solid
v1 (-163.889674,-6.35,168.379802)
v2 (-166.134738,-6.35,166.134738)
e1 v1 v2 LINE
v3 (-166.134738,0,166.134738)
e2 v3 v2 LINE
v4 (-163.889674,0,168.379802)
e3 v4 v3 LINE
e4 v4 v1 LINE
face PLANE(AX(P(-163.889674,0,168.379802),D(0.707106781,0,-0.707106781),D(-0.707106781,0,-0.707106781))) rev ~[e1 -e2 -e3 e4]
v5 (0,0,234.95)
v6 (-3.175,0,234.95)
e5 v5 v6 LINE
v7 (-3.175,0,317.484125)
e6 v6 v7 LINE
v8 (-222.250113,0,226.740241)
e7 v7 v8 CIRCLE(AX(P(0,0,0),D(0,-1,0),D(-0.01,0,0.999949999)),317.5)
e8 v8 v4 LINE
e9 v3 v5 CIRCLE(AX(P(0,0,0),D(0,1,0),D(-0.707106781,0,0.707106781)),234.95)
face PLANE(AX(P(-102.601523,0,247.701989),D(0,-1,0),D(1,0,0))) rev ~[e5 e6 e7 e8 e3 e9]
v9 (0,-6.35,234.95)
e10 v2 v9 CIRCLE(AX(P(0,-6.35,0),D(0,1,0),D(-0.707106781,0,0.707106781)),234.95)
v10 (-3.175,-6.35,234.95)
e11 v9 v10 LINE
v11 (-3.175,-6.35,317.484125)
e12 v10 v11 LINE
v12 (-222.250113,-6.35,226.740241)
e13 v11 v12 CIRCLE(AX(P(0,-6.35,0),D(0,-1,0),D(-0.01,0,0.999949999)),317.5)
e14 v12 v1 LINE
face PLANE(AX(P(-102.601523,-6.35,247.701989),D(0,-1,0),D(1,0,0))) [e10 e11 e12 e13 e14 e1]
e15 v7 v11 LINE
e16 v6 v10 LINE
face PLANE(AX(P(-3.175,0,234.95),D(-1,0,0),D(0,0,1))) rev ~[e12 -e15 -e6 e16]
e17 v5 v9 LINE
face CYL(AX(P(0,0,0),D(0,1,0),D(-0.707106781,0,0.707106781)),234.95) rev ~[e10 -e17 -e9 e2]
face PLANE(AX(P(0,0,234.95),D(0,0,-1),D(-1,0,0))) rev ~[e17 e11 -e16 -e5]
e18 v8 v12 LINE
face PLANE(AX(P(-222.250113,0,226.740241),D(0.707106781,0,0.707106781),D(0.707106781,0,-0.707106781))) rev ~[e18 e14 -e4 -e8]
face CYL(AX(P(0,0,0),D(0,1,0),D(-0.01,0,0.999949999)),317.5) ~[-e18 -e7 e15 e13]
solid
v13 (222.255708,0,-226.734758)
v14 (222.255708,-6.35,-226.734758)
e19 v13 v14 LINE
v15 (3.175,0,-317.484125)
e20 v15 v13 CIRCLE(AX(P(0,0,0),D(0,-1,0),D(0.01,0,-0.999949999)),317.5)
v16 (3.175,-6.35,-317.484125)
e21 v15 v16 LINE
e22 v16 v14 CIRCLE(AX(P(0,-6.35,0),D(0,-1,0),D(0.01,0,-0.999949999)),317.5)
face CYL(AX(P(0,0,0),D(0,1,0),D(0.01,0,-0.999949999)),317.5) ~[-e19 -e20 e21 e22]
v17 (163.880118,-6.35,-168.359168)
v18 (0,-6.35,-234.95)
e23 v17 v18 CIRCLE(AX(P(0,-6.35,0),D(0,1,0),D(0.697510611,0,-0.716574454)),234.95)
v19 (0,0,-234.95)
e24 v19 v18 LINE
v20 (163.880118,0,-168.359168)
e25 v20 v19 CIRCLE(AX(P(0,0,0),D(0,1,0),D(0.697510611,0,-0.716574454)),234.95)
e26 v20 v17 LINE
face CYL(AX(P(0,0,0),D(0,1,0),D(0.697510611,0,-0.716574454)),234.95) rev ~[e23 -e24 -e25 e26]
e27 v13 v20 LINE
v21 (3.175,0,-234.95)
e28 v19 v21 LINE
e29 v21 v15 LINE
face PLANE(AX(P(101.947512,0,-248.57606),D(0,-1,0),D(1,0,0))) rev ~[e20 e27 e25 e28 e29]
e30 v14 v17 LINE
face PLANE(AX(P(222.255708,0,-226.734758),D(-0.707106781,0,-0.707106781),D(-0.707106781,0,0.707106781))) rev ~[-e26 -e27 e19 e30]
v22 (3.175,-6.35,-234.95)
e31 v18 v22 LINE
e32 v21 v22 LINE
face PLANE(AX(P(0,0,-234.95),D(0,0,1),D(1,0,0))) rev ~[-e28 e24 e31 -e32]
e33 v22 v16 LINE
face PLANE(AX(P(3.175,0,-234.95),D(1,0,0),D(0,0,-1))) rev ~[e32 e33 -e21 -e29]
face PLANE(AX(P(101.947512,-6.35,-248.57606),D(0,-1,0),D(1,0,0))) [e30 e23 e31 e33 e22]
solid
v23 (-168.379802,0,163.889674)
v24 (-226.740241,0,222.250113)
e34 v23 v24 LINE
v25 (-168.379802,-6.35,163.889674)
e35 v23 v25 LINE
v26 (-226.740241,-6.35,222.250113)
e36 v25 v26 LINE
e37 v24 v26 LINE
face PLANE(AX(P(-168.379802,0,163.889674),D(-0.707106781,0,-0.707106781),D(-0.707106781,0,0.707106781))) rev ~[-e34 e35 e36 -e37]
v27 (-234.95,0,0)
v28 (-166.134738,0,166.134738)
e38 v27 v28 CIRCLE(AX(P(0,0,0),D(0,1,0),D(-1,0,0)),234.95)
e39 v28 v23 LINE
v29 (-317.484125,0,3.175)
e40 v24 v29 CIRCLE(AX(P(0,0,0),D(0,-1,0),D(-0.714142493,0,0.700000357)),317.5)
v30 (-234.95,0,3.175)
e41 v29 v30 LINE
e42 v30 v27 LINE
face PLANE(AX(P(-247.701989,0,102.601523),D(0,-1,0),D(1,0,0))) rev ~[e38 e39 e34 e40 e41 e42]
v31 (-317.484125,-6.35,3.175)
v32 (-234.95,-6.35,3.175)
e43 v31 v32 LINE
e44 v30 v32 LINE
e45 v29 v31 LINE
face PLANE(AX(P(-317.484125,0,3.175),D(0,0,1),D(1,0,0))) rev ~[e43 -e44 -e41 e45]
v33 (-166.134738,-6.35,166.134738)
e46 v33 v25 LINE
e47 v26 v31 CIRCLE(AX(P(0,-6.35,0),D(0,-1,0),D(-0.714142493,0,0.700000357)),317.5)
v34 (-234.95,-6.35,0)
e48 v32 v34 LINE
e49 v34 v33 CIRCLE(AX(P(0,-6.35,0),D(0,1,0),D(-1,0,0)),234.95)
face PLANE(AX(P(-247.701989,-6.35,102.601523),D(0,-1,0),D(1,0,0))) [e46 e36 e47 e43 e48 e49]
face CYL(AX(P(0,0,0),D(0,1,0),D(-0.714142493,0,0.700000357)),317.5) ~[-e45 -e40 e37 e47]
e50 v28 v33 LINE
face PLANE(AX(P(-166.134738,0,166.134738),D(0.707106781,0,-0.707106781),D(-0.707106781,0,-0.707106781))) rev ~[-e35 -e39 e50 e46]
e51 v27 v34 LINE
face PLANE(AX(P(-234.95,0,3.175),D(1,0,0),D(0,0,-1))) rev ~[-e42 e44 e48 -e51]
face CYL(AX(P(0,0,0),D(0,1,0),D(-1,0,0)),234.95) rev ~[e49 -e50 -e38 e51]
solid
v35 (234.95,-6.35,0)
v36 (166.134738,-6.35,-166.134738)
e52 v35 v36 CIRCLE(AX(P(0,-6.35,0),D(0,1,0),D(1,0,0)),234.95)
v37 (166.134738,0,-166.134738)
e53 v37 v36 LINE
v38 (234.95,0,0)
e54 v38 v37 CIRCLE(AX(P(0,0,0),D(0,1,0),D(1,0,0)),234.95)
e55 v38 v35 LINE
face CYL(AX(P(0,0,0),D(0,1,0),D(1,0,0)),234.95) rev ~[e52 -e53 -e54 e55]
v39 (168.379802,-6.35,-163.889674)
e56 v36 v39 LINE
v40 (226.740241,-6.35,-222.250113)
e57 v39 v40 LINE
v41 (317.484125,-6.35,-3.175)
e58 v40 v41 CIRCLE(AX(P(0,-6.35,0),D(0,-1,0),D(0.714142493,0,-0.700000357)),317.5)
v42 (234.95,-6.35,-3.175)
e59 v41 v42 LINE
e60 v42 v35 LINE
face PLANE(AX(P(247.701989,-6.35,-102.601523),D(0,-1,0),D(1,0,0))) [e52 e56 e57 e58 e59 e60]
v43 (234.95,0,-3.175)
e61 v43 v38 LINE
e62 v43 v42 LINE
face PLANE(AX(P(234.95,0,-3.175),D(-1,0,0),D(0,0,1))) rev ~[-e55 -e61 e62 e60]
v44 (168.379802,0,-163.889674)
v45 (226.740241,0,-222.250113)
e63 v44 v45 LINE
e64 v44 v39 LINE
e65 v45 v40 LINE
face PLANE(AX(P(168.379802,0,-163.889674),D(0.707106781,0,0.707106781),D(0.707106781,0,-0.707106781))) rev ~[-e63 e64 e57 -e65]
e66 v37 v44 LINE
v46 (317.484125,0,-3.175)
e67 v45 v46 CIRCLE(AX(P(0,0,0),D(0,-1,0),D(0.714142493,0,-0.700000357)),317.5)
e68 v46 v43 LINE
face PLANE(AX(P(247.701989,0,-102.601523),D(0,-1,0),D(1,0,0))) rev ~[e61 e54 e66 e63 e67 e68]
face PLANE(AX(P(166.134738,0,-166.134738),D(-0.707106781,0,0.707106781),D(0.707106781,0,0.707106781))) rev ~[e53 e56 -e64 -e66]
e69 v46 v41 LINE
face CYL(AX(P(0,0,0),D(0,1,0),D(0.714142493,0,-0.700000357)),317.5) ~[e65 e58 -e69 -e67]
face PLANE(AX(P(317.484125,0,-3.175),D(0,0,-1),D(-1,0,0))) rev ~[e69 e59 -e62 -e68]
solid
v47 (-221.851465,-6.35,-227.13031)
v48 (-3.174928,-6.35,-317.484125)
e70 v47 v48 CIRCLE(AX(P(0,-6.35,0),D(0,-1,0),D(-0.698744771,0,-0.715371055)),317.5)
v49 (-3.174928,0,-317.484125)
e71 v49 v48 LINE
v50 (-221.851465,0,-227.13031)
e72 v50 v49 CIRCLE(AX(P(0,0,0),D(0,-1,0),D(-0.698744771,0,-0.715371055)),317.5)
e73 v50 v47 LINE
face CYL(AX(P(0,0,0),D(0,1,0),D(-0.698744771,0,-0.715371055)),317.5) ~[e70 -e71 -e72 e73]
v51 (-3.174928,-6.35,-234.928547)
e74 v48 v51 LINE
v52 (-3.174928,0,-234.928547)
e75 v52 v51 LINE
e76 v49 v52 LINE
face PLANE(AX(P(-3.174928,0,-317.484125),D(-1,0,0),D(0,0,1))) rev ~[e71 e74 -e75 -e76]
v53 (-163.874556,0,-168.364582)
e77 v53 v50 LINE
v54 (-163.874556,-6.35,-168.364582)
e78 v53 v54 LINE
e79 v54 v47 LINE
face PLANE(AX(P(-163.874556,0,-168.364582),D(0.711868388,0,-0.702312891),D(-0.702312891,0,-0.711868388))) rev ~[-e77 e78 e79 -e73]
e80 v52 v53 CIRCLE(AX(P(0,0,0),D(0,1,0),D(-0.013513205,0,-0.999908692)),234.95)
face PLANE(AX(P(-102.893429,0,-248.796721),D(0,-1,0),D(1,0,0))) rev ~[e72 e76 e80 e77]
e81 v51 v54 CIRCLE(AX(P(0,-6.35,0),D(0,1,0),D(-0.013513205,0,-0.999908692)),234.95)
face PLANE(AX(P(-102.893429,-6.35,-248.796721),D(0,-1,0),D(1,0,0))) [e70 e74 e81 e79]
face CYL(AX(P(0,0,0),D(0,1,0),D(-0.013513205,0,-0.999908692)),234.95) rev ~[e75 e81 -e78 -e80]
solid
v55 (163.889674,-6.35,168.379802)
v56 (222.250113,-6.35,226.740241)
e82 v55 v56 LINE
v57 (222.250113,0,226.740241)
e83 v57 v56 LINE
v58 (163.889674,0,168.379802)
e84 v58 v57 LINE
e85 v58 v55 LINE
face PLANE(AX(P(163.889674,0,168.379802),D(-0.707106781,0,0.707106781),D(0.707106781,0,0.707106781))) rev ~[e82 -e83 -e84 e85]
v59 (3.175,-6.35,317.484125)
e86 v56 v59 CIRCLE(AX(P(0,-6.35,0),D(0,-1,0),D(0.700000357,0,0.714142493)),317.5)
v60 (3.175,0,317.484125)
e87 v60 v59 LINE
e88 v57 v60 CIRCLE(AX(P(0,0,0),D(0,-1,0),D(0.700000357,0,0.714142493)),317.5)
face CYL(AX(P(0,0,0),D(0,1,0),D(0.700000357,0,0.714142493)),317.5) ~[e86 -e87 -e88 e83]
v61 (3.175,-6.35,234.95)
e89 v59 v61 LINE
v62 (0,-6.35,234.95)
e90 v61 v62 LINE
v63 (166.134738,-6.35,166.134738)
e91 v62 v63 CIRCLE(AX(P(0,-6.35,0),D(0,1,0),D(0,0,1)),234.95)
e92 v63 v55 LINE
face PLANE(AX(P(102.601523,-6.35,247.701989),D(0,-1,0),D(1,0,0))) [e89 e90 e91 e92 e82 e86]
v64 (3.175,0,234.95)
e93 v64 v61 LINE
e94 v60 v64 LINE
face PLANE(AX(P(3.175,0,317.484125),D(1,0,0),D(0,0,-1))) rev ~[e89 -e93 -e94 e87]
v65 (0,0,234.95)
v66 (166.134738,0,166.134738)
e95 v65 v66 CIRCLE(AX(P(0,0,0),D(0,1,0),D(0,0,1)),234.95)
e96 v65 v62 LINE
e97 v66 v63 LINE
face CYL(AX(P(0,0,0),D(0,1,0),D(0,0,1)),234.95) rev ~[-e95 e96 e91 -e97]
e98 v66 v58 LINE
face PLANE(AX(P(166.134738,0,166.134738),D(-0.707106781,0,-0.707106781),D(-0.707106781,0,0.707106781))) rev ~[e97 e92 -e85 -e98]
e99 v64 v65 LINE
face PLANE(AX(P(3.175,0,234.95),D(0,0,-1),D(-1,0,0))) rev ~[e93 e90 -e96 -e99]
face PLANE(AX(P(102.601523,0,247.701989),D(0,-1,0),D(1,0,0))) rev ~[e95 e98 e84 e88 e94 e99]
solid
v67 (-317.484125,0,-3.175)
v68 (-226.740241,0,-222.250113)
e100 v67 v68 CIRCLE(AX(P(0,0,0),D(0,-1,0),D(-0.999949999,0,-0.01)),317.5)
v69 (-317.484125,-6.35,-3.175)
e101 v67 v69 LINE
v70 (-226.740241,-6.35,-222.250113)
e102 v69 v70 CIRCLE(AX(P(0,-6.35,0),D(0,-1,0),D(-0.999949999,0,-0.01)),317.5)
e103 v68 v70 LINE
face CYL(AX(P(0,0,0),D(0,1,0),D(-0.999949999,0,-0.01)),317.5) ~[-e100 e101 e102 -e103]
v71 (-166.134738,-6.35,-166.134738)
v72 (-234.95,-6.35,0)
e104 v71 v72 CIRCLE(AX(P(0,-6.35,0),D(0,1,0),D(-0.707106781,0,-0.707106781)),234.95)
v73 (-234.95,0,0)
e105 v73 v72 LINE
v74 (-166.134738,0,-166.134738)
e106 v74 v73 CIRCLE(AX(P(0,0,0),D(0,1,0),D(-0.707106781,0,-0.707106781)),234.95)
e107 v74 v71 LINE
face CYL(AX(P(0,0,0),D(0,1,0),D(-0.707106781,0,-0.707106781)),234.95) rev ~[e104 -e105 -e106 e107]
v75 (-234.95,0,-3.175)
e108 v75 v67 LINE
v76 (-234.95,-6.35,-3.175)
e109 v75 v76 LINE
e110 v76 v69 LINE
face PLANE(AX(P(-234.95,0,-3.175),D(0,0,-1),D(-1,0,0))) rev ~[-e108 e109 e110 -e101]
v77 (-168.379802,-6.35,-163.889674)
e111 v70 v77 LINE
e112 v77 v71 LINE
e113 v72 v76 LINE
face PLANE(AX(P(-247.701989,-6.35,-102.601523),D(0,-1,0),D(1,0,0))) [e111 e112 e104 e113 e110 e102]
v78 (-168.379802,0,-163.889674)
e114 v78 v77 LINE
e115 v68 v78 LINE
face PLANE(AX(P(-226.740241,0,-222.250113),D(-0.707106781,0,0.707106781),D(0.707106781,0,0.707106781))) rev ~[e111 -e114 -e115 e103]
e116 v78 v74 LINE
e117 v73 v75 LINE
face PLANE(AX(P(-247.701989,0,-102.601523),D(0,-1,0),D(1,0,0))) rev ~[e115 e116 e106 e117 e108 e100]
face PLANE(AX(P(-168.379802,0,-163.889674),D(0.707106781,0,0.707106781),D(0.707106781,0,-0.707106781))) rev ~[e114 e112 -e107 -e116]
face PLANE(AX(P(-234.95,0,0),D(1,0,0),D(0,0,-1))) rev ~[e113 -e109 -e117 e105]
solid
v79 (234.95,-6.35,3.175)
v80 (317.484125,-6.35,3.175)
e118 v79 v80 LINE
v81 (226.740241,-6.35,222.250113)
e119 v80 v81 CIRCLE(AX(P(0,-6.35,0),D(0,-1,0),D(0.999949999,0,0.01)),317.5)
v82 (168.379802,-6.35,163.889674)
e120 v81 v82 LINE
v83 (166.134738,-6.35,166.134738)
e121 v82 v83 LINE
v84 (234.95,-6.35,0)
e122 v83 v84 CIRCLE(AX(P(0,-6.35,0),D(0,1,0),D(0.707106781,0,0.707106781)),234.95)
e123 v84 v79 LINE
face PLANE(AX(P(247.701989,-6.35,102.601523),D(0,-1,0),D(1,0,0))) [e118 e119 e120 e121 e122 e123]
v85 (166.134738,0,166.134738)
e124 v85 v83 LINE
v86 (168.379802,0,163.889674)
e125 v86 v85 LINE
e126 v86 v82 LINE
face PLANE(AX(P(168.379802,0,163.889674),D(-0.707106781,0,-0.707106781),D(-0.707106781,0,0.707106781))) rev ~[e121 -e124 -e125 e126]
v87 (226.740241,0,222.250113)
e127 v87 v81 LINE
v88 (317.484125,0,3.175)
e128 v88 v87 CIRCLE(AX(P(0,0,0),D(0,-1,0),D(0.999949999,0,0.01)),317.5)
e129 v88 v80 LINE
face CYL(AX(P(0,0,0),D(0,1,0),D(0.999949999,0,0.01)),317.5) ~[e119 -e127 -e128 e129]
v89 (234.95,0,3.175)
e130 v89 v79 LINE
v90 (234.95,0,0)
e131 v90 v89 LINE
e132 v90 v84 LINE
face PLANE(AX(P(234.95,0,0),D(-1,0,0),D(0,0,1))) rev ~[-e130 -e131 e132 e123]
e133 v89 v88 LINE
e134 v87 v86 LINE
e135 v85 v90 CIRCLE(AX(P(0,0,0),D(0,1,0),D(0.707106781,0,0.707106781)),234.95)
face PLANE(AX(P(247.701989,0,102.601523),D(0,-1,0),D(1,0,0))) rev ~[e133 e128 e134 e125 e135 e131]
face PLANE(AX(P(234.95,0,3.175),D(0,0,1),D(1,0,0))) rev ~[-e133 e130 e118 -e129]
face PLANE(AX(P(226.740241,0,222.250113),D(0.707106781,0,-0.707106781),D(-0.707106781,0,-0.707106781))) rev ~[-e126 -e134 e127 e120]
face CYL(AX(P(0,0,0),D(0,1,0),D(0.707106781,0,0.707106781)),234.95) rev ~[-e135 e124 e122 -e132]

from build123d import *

# Parameters (mm, degrees)
F1_DEPTH = 6.35


with BuildPart() as f1:
    # F0 (on Front) → F1 (new body)
    with BuildSketch(Plane.XZ):
        with BuildLine():
            Line((234.95, -3.175), (234.95, 0))
            ThreePointArc((234.95, 0), (217.0654961635, -89.9114724342), (166.1347382398, -166.1347382398))
            Line((166.1347382398, -166.1347382398), (168.37980227, -163.8896742095))
            Line((168.37980227, -163.8896742095), (226.7402414562, -222.2501133957))
            ThreePointArc((226.7402414562, -222.2501133957), (293.3317515723, -121.5019897759), (317.4841246031, -3.175))
            Line((317.4841246031, -3.175), (234.95, -3.175))
        make_face()
    extrude(amount=F1_DEPTH)


with BuildPart() as f1b:
    # F0 (on Front) → F1, piece 2 (new body)
    with BuildSketch(Plane.XZ):
        with BuildLine():
            ThreePointArc((166.1347382398, 166.1347382398), (217.0654961635, 89.9114724342), (234.95, 0))
            Line((234.95, 0), (234.95, 3.175))
            Line((234.95, 3.175), (317.4841246031, 3.175))
            ThreePointArc((317.4841246031, 3.175), (293.3317515723, 121.5019897759), (226.7402414562, 222.2501133957))
            Line((226.7402414562, 222.2501133957), (168.37980227, 163.8896742095))
            Line((168.37980227, 163.8896742095), (166.1347382398, 166.1347382398))
        make_face()
    extrude(amount=F1_DEPTH)


with BuildPart() as f1c:
    # F0 (on Front) → F1, piece 3 (new body)
    with BuildSketch(Plane.XZ):
        with BuildLine():
            ThreePointArc((0, 234.95), (89.9114724342, 217.0654961635), (166.1347382398, 166.1347382398))
            Line((166.1347382398, 166.1347382398), (163.8896742095, 168.37980227))
            Line((163.8896742095, 168.37980227), (222.2501133957, 226.7402414562))
            ThreePointArc((222.2501133957, 226.7402414562), (121.5019897759, 293.3317515723), (3.175, 317.4841246031))
            Line((3.175, 317.4841246031), (3.175, 234.95))
            Line((3.175, 234.95), (0, 234.95))
        make_face()
    extrude(amount=F1_DEPTH)


with BuildPart() as f1d:
    # F0 (on Front) → F1, piece 4 (new body)
    with BuildSketch(Plane.XZ):
        with BuildLine():
            ThreePointArc((-166.1347382398, 166.1347382398), (-89.9114724342, 217.0654961635), (0, 234.95))
            Line((0, 234.95), (-3.175, 234.95))
            Line((-3.175, 234.95), (-3.175, 317.4841246031))
            ThreePointArc((-3.175, 317.4841246031), (-121.5019897759, 293.3317515723), (-222.2501133957, 226.7402414562))
            Line((-222.2501133957, 226.7402414562), (-163.8896742095, 168.37980227))
            Line((-163.8896742095, 168.37980227), (-166.1347382398, 166.1347382398))
        make_face()
    extrude(amount=F1_DEPTH)


with BuildPart() as f1e:
    # F0 (on Front) → F1, piece 5 (new body)
    with BuildSketch(Plane.XZ):
        with BuildLine():
            Line((222.2557078015, -226.7347577008), (163.8801180129, -168.3591679122))
            ThreePointArc((163.8801180129, -168.3591679122), (88.4463566209, -217.6665902257), (0, -234.95))
            Line((0, -234.95), (3.175, -234.95))
            Line((3.175, -234.95), (3.175, -317.4841246031))
            ThreePointArc((3.175, -317.4841246031), (121.505608526, -293.3302526108), (222.2557078015, -226.7347577008))
        make_face()
    extrude(amount=F1_DEPTH)


with BuildPart() as f1f:
    # F0 (on Front) → F1, piece 6 (new body)
    with BuildSketch(Plane.XZ):
        with BuildLine():
            ThreePointArc((-234.95, 0), (-217.0654961635, 89.9114724342), (-166.1347382398, 166.1347382398))
            Line((-166.1347382398, 166.1347382398), (-168.37980227, 163.8896742095))
            Line((-168.37980227, 163.8896742095), (-226.7402414562, 222.2501133957))
            ThreePointArc((-226.7402414562, 222.2501133957), (-293.3317515723, 121.5019897759), (-317.4841246031, 3.175))
            Line((-317.4841246031, 3.175), (-234.95, 3.175))
            Line((-234.95, 3.175), (-234.95, 0))
        make_face()
    extrude(amount=F1_DEPTH)


with BuildPart() as f1g:
    # F0 (on Front) → F1, piece 7 (new body)
    with BuildSketch(Plane.XZ):
        with BuildLine():
            ThreePointArc((-166.1347382398, -166.1347382398), (-217.0654961635, -89.9114724342), (-234.95, 0))
            Line((-234.95, 0), (-234.95, -3.175))
            Line((-234.95, -3.175), (-317.4841246031, -3.175))
            ThreePointArc((-317.4841246031, -3.175), (-293.3317515723, -121.5019897759), (-226.7402414562, -222.2501133957))
            Line((-226.7402414562, -222.2501133957), (-168.37980227, -163.8896742095))
            Line((-168.37980227, -163.8896742095), (-166.1347382398, -166.1347382398))
        make_face()
    extrude(amount=F1_DEPTH)


with BuildPart() as f1h:
    # F0 (on Front) → F1, piece 8 (new body)
    with BuildSketch(Plane.XZ):
        with BuildLine():
            Line((-3.1749275238, -317.4841253279), (-3.1749275238, -234.9285472973))
            ThreePointArc((-3.1749275238, -234.9285472973), (-89.9114724342, -217.0654961635), (-163.8745561064, -168.3645816701))
            Line((-163.8745561064, -168.3645816701), (-221.8514646433, -227.1303098127))
            ThreePointArc((-221.8514646433, -227.1303098127), (-121.2442670293, -293.4383712341), (-3.1749275238, -317.4841253279))
        make_face()
    extrude(amount=F1_DEPTH)


solid = Compound([f1.part, f1b.part, f1c.part, f1d.part, f1e.part, f1f.part, f1g.part, f1h.part])
